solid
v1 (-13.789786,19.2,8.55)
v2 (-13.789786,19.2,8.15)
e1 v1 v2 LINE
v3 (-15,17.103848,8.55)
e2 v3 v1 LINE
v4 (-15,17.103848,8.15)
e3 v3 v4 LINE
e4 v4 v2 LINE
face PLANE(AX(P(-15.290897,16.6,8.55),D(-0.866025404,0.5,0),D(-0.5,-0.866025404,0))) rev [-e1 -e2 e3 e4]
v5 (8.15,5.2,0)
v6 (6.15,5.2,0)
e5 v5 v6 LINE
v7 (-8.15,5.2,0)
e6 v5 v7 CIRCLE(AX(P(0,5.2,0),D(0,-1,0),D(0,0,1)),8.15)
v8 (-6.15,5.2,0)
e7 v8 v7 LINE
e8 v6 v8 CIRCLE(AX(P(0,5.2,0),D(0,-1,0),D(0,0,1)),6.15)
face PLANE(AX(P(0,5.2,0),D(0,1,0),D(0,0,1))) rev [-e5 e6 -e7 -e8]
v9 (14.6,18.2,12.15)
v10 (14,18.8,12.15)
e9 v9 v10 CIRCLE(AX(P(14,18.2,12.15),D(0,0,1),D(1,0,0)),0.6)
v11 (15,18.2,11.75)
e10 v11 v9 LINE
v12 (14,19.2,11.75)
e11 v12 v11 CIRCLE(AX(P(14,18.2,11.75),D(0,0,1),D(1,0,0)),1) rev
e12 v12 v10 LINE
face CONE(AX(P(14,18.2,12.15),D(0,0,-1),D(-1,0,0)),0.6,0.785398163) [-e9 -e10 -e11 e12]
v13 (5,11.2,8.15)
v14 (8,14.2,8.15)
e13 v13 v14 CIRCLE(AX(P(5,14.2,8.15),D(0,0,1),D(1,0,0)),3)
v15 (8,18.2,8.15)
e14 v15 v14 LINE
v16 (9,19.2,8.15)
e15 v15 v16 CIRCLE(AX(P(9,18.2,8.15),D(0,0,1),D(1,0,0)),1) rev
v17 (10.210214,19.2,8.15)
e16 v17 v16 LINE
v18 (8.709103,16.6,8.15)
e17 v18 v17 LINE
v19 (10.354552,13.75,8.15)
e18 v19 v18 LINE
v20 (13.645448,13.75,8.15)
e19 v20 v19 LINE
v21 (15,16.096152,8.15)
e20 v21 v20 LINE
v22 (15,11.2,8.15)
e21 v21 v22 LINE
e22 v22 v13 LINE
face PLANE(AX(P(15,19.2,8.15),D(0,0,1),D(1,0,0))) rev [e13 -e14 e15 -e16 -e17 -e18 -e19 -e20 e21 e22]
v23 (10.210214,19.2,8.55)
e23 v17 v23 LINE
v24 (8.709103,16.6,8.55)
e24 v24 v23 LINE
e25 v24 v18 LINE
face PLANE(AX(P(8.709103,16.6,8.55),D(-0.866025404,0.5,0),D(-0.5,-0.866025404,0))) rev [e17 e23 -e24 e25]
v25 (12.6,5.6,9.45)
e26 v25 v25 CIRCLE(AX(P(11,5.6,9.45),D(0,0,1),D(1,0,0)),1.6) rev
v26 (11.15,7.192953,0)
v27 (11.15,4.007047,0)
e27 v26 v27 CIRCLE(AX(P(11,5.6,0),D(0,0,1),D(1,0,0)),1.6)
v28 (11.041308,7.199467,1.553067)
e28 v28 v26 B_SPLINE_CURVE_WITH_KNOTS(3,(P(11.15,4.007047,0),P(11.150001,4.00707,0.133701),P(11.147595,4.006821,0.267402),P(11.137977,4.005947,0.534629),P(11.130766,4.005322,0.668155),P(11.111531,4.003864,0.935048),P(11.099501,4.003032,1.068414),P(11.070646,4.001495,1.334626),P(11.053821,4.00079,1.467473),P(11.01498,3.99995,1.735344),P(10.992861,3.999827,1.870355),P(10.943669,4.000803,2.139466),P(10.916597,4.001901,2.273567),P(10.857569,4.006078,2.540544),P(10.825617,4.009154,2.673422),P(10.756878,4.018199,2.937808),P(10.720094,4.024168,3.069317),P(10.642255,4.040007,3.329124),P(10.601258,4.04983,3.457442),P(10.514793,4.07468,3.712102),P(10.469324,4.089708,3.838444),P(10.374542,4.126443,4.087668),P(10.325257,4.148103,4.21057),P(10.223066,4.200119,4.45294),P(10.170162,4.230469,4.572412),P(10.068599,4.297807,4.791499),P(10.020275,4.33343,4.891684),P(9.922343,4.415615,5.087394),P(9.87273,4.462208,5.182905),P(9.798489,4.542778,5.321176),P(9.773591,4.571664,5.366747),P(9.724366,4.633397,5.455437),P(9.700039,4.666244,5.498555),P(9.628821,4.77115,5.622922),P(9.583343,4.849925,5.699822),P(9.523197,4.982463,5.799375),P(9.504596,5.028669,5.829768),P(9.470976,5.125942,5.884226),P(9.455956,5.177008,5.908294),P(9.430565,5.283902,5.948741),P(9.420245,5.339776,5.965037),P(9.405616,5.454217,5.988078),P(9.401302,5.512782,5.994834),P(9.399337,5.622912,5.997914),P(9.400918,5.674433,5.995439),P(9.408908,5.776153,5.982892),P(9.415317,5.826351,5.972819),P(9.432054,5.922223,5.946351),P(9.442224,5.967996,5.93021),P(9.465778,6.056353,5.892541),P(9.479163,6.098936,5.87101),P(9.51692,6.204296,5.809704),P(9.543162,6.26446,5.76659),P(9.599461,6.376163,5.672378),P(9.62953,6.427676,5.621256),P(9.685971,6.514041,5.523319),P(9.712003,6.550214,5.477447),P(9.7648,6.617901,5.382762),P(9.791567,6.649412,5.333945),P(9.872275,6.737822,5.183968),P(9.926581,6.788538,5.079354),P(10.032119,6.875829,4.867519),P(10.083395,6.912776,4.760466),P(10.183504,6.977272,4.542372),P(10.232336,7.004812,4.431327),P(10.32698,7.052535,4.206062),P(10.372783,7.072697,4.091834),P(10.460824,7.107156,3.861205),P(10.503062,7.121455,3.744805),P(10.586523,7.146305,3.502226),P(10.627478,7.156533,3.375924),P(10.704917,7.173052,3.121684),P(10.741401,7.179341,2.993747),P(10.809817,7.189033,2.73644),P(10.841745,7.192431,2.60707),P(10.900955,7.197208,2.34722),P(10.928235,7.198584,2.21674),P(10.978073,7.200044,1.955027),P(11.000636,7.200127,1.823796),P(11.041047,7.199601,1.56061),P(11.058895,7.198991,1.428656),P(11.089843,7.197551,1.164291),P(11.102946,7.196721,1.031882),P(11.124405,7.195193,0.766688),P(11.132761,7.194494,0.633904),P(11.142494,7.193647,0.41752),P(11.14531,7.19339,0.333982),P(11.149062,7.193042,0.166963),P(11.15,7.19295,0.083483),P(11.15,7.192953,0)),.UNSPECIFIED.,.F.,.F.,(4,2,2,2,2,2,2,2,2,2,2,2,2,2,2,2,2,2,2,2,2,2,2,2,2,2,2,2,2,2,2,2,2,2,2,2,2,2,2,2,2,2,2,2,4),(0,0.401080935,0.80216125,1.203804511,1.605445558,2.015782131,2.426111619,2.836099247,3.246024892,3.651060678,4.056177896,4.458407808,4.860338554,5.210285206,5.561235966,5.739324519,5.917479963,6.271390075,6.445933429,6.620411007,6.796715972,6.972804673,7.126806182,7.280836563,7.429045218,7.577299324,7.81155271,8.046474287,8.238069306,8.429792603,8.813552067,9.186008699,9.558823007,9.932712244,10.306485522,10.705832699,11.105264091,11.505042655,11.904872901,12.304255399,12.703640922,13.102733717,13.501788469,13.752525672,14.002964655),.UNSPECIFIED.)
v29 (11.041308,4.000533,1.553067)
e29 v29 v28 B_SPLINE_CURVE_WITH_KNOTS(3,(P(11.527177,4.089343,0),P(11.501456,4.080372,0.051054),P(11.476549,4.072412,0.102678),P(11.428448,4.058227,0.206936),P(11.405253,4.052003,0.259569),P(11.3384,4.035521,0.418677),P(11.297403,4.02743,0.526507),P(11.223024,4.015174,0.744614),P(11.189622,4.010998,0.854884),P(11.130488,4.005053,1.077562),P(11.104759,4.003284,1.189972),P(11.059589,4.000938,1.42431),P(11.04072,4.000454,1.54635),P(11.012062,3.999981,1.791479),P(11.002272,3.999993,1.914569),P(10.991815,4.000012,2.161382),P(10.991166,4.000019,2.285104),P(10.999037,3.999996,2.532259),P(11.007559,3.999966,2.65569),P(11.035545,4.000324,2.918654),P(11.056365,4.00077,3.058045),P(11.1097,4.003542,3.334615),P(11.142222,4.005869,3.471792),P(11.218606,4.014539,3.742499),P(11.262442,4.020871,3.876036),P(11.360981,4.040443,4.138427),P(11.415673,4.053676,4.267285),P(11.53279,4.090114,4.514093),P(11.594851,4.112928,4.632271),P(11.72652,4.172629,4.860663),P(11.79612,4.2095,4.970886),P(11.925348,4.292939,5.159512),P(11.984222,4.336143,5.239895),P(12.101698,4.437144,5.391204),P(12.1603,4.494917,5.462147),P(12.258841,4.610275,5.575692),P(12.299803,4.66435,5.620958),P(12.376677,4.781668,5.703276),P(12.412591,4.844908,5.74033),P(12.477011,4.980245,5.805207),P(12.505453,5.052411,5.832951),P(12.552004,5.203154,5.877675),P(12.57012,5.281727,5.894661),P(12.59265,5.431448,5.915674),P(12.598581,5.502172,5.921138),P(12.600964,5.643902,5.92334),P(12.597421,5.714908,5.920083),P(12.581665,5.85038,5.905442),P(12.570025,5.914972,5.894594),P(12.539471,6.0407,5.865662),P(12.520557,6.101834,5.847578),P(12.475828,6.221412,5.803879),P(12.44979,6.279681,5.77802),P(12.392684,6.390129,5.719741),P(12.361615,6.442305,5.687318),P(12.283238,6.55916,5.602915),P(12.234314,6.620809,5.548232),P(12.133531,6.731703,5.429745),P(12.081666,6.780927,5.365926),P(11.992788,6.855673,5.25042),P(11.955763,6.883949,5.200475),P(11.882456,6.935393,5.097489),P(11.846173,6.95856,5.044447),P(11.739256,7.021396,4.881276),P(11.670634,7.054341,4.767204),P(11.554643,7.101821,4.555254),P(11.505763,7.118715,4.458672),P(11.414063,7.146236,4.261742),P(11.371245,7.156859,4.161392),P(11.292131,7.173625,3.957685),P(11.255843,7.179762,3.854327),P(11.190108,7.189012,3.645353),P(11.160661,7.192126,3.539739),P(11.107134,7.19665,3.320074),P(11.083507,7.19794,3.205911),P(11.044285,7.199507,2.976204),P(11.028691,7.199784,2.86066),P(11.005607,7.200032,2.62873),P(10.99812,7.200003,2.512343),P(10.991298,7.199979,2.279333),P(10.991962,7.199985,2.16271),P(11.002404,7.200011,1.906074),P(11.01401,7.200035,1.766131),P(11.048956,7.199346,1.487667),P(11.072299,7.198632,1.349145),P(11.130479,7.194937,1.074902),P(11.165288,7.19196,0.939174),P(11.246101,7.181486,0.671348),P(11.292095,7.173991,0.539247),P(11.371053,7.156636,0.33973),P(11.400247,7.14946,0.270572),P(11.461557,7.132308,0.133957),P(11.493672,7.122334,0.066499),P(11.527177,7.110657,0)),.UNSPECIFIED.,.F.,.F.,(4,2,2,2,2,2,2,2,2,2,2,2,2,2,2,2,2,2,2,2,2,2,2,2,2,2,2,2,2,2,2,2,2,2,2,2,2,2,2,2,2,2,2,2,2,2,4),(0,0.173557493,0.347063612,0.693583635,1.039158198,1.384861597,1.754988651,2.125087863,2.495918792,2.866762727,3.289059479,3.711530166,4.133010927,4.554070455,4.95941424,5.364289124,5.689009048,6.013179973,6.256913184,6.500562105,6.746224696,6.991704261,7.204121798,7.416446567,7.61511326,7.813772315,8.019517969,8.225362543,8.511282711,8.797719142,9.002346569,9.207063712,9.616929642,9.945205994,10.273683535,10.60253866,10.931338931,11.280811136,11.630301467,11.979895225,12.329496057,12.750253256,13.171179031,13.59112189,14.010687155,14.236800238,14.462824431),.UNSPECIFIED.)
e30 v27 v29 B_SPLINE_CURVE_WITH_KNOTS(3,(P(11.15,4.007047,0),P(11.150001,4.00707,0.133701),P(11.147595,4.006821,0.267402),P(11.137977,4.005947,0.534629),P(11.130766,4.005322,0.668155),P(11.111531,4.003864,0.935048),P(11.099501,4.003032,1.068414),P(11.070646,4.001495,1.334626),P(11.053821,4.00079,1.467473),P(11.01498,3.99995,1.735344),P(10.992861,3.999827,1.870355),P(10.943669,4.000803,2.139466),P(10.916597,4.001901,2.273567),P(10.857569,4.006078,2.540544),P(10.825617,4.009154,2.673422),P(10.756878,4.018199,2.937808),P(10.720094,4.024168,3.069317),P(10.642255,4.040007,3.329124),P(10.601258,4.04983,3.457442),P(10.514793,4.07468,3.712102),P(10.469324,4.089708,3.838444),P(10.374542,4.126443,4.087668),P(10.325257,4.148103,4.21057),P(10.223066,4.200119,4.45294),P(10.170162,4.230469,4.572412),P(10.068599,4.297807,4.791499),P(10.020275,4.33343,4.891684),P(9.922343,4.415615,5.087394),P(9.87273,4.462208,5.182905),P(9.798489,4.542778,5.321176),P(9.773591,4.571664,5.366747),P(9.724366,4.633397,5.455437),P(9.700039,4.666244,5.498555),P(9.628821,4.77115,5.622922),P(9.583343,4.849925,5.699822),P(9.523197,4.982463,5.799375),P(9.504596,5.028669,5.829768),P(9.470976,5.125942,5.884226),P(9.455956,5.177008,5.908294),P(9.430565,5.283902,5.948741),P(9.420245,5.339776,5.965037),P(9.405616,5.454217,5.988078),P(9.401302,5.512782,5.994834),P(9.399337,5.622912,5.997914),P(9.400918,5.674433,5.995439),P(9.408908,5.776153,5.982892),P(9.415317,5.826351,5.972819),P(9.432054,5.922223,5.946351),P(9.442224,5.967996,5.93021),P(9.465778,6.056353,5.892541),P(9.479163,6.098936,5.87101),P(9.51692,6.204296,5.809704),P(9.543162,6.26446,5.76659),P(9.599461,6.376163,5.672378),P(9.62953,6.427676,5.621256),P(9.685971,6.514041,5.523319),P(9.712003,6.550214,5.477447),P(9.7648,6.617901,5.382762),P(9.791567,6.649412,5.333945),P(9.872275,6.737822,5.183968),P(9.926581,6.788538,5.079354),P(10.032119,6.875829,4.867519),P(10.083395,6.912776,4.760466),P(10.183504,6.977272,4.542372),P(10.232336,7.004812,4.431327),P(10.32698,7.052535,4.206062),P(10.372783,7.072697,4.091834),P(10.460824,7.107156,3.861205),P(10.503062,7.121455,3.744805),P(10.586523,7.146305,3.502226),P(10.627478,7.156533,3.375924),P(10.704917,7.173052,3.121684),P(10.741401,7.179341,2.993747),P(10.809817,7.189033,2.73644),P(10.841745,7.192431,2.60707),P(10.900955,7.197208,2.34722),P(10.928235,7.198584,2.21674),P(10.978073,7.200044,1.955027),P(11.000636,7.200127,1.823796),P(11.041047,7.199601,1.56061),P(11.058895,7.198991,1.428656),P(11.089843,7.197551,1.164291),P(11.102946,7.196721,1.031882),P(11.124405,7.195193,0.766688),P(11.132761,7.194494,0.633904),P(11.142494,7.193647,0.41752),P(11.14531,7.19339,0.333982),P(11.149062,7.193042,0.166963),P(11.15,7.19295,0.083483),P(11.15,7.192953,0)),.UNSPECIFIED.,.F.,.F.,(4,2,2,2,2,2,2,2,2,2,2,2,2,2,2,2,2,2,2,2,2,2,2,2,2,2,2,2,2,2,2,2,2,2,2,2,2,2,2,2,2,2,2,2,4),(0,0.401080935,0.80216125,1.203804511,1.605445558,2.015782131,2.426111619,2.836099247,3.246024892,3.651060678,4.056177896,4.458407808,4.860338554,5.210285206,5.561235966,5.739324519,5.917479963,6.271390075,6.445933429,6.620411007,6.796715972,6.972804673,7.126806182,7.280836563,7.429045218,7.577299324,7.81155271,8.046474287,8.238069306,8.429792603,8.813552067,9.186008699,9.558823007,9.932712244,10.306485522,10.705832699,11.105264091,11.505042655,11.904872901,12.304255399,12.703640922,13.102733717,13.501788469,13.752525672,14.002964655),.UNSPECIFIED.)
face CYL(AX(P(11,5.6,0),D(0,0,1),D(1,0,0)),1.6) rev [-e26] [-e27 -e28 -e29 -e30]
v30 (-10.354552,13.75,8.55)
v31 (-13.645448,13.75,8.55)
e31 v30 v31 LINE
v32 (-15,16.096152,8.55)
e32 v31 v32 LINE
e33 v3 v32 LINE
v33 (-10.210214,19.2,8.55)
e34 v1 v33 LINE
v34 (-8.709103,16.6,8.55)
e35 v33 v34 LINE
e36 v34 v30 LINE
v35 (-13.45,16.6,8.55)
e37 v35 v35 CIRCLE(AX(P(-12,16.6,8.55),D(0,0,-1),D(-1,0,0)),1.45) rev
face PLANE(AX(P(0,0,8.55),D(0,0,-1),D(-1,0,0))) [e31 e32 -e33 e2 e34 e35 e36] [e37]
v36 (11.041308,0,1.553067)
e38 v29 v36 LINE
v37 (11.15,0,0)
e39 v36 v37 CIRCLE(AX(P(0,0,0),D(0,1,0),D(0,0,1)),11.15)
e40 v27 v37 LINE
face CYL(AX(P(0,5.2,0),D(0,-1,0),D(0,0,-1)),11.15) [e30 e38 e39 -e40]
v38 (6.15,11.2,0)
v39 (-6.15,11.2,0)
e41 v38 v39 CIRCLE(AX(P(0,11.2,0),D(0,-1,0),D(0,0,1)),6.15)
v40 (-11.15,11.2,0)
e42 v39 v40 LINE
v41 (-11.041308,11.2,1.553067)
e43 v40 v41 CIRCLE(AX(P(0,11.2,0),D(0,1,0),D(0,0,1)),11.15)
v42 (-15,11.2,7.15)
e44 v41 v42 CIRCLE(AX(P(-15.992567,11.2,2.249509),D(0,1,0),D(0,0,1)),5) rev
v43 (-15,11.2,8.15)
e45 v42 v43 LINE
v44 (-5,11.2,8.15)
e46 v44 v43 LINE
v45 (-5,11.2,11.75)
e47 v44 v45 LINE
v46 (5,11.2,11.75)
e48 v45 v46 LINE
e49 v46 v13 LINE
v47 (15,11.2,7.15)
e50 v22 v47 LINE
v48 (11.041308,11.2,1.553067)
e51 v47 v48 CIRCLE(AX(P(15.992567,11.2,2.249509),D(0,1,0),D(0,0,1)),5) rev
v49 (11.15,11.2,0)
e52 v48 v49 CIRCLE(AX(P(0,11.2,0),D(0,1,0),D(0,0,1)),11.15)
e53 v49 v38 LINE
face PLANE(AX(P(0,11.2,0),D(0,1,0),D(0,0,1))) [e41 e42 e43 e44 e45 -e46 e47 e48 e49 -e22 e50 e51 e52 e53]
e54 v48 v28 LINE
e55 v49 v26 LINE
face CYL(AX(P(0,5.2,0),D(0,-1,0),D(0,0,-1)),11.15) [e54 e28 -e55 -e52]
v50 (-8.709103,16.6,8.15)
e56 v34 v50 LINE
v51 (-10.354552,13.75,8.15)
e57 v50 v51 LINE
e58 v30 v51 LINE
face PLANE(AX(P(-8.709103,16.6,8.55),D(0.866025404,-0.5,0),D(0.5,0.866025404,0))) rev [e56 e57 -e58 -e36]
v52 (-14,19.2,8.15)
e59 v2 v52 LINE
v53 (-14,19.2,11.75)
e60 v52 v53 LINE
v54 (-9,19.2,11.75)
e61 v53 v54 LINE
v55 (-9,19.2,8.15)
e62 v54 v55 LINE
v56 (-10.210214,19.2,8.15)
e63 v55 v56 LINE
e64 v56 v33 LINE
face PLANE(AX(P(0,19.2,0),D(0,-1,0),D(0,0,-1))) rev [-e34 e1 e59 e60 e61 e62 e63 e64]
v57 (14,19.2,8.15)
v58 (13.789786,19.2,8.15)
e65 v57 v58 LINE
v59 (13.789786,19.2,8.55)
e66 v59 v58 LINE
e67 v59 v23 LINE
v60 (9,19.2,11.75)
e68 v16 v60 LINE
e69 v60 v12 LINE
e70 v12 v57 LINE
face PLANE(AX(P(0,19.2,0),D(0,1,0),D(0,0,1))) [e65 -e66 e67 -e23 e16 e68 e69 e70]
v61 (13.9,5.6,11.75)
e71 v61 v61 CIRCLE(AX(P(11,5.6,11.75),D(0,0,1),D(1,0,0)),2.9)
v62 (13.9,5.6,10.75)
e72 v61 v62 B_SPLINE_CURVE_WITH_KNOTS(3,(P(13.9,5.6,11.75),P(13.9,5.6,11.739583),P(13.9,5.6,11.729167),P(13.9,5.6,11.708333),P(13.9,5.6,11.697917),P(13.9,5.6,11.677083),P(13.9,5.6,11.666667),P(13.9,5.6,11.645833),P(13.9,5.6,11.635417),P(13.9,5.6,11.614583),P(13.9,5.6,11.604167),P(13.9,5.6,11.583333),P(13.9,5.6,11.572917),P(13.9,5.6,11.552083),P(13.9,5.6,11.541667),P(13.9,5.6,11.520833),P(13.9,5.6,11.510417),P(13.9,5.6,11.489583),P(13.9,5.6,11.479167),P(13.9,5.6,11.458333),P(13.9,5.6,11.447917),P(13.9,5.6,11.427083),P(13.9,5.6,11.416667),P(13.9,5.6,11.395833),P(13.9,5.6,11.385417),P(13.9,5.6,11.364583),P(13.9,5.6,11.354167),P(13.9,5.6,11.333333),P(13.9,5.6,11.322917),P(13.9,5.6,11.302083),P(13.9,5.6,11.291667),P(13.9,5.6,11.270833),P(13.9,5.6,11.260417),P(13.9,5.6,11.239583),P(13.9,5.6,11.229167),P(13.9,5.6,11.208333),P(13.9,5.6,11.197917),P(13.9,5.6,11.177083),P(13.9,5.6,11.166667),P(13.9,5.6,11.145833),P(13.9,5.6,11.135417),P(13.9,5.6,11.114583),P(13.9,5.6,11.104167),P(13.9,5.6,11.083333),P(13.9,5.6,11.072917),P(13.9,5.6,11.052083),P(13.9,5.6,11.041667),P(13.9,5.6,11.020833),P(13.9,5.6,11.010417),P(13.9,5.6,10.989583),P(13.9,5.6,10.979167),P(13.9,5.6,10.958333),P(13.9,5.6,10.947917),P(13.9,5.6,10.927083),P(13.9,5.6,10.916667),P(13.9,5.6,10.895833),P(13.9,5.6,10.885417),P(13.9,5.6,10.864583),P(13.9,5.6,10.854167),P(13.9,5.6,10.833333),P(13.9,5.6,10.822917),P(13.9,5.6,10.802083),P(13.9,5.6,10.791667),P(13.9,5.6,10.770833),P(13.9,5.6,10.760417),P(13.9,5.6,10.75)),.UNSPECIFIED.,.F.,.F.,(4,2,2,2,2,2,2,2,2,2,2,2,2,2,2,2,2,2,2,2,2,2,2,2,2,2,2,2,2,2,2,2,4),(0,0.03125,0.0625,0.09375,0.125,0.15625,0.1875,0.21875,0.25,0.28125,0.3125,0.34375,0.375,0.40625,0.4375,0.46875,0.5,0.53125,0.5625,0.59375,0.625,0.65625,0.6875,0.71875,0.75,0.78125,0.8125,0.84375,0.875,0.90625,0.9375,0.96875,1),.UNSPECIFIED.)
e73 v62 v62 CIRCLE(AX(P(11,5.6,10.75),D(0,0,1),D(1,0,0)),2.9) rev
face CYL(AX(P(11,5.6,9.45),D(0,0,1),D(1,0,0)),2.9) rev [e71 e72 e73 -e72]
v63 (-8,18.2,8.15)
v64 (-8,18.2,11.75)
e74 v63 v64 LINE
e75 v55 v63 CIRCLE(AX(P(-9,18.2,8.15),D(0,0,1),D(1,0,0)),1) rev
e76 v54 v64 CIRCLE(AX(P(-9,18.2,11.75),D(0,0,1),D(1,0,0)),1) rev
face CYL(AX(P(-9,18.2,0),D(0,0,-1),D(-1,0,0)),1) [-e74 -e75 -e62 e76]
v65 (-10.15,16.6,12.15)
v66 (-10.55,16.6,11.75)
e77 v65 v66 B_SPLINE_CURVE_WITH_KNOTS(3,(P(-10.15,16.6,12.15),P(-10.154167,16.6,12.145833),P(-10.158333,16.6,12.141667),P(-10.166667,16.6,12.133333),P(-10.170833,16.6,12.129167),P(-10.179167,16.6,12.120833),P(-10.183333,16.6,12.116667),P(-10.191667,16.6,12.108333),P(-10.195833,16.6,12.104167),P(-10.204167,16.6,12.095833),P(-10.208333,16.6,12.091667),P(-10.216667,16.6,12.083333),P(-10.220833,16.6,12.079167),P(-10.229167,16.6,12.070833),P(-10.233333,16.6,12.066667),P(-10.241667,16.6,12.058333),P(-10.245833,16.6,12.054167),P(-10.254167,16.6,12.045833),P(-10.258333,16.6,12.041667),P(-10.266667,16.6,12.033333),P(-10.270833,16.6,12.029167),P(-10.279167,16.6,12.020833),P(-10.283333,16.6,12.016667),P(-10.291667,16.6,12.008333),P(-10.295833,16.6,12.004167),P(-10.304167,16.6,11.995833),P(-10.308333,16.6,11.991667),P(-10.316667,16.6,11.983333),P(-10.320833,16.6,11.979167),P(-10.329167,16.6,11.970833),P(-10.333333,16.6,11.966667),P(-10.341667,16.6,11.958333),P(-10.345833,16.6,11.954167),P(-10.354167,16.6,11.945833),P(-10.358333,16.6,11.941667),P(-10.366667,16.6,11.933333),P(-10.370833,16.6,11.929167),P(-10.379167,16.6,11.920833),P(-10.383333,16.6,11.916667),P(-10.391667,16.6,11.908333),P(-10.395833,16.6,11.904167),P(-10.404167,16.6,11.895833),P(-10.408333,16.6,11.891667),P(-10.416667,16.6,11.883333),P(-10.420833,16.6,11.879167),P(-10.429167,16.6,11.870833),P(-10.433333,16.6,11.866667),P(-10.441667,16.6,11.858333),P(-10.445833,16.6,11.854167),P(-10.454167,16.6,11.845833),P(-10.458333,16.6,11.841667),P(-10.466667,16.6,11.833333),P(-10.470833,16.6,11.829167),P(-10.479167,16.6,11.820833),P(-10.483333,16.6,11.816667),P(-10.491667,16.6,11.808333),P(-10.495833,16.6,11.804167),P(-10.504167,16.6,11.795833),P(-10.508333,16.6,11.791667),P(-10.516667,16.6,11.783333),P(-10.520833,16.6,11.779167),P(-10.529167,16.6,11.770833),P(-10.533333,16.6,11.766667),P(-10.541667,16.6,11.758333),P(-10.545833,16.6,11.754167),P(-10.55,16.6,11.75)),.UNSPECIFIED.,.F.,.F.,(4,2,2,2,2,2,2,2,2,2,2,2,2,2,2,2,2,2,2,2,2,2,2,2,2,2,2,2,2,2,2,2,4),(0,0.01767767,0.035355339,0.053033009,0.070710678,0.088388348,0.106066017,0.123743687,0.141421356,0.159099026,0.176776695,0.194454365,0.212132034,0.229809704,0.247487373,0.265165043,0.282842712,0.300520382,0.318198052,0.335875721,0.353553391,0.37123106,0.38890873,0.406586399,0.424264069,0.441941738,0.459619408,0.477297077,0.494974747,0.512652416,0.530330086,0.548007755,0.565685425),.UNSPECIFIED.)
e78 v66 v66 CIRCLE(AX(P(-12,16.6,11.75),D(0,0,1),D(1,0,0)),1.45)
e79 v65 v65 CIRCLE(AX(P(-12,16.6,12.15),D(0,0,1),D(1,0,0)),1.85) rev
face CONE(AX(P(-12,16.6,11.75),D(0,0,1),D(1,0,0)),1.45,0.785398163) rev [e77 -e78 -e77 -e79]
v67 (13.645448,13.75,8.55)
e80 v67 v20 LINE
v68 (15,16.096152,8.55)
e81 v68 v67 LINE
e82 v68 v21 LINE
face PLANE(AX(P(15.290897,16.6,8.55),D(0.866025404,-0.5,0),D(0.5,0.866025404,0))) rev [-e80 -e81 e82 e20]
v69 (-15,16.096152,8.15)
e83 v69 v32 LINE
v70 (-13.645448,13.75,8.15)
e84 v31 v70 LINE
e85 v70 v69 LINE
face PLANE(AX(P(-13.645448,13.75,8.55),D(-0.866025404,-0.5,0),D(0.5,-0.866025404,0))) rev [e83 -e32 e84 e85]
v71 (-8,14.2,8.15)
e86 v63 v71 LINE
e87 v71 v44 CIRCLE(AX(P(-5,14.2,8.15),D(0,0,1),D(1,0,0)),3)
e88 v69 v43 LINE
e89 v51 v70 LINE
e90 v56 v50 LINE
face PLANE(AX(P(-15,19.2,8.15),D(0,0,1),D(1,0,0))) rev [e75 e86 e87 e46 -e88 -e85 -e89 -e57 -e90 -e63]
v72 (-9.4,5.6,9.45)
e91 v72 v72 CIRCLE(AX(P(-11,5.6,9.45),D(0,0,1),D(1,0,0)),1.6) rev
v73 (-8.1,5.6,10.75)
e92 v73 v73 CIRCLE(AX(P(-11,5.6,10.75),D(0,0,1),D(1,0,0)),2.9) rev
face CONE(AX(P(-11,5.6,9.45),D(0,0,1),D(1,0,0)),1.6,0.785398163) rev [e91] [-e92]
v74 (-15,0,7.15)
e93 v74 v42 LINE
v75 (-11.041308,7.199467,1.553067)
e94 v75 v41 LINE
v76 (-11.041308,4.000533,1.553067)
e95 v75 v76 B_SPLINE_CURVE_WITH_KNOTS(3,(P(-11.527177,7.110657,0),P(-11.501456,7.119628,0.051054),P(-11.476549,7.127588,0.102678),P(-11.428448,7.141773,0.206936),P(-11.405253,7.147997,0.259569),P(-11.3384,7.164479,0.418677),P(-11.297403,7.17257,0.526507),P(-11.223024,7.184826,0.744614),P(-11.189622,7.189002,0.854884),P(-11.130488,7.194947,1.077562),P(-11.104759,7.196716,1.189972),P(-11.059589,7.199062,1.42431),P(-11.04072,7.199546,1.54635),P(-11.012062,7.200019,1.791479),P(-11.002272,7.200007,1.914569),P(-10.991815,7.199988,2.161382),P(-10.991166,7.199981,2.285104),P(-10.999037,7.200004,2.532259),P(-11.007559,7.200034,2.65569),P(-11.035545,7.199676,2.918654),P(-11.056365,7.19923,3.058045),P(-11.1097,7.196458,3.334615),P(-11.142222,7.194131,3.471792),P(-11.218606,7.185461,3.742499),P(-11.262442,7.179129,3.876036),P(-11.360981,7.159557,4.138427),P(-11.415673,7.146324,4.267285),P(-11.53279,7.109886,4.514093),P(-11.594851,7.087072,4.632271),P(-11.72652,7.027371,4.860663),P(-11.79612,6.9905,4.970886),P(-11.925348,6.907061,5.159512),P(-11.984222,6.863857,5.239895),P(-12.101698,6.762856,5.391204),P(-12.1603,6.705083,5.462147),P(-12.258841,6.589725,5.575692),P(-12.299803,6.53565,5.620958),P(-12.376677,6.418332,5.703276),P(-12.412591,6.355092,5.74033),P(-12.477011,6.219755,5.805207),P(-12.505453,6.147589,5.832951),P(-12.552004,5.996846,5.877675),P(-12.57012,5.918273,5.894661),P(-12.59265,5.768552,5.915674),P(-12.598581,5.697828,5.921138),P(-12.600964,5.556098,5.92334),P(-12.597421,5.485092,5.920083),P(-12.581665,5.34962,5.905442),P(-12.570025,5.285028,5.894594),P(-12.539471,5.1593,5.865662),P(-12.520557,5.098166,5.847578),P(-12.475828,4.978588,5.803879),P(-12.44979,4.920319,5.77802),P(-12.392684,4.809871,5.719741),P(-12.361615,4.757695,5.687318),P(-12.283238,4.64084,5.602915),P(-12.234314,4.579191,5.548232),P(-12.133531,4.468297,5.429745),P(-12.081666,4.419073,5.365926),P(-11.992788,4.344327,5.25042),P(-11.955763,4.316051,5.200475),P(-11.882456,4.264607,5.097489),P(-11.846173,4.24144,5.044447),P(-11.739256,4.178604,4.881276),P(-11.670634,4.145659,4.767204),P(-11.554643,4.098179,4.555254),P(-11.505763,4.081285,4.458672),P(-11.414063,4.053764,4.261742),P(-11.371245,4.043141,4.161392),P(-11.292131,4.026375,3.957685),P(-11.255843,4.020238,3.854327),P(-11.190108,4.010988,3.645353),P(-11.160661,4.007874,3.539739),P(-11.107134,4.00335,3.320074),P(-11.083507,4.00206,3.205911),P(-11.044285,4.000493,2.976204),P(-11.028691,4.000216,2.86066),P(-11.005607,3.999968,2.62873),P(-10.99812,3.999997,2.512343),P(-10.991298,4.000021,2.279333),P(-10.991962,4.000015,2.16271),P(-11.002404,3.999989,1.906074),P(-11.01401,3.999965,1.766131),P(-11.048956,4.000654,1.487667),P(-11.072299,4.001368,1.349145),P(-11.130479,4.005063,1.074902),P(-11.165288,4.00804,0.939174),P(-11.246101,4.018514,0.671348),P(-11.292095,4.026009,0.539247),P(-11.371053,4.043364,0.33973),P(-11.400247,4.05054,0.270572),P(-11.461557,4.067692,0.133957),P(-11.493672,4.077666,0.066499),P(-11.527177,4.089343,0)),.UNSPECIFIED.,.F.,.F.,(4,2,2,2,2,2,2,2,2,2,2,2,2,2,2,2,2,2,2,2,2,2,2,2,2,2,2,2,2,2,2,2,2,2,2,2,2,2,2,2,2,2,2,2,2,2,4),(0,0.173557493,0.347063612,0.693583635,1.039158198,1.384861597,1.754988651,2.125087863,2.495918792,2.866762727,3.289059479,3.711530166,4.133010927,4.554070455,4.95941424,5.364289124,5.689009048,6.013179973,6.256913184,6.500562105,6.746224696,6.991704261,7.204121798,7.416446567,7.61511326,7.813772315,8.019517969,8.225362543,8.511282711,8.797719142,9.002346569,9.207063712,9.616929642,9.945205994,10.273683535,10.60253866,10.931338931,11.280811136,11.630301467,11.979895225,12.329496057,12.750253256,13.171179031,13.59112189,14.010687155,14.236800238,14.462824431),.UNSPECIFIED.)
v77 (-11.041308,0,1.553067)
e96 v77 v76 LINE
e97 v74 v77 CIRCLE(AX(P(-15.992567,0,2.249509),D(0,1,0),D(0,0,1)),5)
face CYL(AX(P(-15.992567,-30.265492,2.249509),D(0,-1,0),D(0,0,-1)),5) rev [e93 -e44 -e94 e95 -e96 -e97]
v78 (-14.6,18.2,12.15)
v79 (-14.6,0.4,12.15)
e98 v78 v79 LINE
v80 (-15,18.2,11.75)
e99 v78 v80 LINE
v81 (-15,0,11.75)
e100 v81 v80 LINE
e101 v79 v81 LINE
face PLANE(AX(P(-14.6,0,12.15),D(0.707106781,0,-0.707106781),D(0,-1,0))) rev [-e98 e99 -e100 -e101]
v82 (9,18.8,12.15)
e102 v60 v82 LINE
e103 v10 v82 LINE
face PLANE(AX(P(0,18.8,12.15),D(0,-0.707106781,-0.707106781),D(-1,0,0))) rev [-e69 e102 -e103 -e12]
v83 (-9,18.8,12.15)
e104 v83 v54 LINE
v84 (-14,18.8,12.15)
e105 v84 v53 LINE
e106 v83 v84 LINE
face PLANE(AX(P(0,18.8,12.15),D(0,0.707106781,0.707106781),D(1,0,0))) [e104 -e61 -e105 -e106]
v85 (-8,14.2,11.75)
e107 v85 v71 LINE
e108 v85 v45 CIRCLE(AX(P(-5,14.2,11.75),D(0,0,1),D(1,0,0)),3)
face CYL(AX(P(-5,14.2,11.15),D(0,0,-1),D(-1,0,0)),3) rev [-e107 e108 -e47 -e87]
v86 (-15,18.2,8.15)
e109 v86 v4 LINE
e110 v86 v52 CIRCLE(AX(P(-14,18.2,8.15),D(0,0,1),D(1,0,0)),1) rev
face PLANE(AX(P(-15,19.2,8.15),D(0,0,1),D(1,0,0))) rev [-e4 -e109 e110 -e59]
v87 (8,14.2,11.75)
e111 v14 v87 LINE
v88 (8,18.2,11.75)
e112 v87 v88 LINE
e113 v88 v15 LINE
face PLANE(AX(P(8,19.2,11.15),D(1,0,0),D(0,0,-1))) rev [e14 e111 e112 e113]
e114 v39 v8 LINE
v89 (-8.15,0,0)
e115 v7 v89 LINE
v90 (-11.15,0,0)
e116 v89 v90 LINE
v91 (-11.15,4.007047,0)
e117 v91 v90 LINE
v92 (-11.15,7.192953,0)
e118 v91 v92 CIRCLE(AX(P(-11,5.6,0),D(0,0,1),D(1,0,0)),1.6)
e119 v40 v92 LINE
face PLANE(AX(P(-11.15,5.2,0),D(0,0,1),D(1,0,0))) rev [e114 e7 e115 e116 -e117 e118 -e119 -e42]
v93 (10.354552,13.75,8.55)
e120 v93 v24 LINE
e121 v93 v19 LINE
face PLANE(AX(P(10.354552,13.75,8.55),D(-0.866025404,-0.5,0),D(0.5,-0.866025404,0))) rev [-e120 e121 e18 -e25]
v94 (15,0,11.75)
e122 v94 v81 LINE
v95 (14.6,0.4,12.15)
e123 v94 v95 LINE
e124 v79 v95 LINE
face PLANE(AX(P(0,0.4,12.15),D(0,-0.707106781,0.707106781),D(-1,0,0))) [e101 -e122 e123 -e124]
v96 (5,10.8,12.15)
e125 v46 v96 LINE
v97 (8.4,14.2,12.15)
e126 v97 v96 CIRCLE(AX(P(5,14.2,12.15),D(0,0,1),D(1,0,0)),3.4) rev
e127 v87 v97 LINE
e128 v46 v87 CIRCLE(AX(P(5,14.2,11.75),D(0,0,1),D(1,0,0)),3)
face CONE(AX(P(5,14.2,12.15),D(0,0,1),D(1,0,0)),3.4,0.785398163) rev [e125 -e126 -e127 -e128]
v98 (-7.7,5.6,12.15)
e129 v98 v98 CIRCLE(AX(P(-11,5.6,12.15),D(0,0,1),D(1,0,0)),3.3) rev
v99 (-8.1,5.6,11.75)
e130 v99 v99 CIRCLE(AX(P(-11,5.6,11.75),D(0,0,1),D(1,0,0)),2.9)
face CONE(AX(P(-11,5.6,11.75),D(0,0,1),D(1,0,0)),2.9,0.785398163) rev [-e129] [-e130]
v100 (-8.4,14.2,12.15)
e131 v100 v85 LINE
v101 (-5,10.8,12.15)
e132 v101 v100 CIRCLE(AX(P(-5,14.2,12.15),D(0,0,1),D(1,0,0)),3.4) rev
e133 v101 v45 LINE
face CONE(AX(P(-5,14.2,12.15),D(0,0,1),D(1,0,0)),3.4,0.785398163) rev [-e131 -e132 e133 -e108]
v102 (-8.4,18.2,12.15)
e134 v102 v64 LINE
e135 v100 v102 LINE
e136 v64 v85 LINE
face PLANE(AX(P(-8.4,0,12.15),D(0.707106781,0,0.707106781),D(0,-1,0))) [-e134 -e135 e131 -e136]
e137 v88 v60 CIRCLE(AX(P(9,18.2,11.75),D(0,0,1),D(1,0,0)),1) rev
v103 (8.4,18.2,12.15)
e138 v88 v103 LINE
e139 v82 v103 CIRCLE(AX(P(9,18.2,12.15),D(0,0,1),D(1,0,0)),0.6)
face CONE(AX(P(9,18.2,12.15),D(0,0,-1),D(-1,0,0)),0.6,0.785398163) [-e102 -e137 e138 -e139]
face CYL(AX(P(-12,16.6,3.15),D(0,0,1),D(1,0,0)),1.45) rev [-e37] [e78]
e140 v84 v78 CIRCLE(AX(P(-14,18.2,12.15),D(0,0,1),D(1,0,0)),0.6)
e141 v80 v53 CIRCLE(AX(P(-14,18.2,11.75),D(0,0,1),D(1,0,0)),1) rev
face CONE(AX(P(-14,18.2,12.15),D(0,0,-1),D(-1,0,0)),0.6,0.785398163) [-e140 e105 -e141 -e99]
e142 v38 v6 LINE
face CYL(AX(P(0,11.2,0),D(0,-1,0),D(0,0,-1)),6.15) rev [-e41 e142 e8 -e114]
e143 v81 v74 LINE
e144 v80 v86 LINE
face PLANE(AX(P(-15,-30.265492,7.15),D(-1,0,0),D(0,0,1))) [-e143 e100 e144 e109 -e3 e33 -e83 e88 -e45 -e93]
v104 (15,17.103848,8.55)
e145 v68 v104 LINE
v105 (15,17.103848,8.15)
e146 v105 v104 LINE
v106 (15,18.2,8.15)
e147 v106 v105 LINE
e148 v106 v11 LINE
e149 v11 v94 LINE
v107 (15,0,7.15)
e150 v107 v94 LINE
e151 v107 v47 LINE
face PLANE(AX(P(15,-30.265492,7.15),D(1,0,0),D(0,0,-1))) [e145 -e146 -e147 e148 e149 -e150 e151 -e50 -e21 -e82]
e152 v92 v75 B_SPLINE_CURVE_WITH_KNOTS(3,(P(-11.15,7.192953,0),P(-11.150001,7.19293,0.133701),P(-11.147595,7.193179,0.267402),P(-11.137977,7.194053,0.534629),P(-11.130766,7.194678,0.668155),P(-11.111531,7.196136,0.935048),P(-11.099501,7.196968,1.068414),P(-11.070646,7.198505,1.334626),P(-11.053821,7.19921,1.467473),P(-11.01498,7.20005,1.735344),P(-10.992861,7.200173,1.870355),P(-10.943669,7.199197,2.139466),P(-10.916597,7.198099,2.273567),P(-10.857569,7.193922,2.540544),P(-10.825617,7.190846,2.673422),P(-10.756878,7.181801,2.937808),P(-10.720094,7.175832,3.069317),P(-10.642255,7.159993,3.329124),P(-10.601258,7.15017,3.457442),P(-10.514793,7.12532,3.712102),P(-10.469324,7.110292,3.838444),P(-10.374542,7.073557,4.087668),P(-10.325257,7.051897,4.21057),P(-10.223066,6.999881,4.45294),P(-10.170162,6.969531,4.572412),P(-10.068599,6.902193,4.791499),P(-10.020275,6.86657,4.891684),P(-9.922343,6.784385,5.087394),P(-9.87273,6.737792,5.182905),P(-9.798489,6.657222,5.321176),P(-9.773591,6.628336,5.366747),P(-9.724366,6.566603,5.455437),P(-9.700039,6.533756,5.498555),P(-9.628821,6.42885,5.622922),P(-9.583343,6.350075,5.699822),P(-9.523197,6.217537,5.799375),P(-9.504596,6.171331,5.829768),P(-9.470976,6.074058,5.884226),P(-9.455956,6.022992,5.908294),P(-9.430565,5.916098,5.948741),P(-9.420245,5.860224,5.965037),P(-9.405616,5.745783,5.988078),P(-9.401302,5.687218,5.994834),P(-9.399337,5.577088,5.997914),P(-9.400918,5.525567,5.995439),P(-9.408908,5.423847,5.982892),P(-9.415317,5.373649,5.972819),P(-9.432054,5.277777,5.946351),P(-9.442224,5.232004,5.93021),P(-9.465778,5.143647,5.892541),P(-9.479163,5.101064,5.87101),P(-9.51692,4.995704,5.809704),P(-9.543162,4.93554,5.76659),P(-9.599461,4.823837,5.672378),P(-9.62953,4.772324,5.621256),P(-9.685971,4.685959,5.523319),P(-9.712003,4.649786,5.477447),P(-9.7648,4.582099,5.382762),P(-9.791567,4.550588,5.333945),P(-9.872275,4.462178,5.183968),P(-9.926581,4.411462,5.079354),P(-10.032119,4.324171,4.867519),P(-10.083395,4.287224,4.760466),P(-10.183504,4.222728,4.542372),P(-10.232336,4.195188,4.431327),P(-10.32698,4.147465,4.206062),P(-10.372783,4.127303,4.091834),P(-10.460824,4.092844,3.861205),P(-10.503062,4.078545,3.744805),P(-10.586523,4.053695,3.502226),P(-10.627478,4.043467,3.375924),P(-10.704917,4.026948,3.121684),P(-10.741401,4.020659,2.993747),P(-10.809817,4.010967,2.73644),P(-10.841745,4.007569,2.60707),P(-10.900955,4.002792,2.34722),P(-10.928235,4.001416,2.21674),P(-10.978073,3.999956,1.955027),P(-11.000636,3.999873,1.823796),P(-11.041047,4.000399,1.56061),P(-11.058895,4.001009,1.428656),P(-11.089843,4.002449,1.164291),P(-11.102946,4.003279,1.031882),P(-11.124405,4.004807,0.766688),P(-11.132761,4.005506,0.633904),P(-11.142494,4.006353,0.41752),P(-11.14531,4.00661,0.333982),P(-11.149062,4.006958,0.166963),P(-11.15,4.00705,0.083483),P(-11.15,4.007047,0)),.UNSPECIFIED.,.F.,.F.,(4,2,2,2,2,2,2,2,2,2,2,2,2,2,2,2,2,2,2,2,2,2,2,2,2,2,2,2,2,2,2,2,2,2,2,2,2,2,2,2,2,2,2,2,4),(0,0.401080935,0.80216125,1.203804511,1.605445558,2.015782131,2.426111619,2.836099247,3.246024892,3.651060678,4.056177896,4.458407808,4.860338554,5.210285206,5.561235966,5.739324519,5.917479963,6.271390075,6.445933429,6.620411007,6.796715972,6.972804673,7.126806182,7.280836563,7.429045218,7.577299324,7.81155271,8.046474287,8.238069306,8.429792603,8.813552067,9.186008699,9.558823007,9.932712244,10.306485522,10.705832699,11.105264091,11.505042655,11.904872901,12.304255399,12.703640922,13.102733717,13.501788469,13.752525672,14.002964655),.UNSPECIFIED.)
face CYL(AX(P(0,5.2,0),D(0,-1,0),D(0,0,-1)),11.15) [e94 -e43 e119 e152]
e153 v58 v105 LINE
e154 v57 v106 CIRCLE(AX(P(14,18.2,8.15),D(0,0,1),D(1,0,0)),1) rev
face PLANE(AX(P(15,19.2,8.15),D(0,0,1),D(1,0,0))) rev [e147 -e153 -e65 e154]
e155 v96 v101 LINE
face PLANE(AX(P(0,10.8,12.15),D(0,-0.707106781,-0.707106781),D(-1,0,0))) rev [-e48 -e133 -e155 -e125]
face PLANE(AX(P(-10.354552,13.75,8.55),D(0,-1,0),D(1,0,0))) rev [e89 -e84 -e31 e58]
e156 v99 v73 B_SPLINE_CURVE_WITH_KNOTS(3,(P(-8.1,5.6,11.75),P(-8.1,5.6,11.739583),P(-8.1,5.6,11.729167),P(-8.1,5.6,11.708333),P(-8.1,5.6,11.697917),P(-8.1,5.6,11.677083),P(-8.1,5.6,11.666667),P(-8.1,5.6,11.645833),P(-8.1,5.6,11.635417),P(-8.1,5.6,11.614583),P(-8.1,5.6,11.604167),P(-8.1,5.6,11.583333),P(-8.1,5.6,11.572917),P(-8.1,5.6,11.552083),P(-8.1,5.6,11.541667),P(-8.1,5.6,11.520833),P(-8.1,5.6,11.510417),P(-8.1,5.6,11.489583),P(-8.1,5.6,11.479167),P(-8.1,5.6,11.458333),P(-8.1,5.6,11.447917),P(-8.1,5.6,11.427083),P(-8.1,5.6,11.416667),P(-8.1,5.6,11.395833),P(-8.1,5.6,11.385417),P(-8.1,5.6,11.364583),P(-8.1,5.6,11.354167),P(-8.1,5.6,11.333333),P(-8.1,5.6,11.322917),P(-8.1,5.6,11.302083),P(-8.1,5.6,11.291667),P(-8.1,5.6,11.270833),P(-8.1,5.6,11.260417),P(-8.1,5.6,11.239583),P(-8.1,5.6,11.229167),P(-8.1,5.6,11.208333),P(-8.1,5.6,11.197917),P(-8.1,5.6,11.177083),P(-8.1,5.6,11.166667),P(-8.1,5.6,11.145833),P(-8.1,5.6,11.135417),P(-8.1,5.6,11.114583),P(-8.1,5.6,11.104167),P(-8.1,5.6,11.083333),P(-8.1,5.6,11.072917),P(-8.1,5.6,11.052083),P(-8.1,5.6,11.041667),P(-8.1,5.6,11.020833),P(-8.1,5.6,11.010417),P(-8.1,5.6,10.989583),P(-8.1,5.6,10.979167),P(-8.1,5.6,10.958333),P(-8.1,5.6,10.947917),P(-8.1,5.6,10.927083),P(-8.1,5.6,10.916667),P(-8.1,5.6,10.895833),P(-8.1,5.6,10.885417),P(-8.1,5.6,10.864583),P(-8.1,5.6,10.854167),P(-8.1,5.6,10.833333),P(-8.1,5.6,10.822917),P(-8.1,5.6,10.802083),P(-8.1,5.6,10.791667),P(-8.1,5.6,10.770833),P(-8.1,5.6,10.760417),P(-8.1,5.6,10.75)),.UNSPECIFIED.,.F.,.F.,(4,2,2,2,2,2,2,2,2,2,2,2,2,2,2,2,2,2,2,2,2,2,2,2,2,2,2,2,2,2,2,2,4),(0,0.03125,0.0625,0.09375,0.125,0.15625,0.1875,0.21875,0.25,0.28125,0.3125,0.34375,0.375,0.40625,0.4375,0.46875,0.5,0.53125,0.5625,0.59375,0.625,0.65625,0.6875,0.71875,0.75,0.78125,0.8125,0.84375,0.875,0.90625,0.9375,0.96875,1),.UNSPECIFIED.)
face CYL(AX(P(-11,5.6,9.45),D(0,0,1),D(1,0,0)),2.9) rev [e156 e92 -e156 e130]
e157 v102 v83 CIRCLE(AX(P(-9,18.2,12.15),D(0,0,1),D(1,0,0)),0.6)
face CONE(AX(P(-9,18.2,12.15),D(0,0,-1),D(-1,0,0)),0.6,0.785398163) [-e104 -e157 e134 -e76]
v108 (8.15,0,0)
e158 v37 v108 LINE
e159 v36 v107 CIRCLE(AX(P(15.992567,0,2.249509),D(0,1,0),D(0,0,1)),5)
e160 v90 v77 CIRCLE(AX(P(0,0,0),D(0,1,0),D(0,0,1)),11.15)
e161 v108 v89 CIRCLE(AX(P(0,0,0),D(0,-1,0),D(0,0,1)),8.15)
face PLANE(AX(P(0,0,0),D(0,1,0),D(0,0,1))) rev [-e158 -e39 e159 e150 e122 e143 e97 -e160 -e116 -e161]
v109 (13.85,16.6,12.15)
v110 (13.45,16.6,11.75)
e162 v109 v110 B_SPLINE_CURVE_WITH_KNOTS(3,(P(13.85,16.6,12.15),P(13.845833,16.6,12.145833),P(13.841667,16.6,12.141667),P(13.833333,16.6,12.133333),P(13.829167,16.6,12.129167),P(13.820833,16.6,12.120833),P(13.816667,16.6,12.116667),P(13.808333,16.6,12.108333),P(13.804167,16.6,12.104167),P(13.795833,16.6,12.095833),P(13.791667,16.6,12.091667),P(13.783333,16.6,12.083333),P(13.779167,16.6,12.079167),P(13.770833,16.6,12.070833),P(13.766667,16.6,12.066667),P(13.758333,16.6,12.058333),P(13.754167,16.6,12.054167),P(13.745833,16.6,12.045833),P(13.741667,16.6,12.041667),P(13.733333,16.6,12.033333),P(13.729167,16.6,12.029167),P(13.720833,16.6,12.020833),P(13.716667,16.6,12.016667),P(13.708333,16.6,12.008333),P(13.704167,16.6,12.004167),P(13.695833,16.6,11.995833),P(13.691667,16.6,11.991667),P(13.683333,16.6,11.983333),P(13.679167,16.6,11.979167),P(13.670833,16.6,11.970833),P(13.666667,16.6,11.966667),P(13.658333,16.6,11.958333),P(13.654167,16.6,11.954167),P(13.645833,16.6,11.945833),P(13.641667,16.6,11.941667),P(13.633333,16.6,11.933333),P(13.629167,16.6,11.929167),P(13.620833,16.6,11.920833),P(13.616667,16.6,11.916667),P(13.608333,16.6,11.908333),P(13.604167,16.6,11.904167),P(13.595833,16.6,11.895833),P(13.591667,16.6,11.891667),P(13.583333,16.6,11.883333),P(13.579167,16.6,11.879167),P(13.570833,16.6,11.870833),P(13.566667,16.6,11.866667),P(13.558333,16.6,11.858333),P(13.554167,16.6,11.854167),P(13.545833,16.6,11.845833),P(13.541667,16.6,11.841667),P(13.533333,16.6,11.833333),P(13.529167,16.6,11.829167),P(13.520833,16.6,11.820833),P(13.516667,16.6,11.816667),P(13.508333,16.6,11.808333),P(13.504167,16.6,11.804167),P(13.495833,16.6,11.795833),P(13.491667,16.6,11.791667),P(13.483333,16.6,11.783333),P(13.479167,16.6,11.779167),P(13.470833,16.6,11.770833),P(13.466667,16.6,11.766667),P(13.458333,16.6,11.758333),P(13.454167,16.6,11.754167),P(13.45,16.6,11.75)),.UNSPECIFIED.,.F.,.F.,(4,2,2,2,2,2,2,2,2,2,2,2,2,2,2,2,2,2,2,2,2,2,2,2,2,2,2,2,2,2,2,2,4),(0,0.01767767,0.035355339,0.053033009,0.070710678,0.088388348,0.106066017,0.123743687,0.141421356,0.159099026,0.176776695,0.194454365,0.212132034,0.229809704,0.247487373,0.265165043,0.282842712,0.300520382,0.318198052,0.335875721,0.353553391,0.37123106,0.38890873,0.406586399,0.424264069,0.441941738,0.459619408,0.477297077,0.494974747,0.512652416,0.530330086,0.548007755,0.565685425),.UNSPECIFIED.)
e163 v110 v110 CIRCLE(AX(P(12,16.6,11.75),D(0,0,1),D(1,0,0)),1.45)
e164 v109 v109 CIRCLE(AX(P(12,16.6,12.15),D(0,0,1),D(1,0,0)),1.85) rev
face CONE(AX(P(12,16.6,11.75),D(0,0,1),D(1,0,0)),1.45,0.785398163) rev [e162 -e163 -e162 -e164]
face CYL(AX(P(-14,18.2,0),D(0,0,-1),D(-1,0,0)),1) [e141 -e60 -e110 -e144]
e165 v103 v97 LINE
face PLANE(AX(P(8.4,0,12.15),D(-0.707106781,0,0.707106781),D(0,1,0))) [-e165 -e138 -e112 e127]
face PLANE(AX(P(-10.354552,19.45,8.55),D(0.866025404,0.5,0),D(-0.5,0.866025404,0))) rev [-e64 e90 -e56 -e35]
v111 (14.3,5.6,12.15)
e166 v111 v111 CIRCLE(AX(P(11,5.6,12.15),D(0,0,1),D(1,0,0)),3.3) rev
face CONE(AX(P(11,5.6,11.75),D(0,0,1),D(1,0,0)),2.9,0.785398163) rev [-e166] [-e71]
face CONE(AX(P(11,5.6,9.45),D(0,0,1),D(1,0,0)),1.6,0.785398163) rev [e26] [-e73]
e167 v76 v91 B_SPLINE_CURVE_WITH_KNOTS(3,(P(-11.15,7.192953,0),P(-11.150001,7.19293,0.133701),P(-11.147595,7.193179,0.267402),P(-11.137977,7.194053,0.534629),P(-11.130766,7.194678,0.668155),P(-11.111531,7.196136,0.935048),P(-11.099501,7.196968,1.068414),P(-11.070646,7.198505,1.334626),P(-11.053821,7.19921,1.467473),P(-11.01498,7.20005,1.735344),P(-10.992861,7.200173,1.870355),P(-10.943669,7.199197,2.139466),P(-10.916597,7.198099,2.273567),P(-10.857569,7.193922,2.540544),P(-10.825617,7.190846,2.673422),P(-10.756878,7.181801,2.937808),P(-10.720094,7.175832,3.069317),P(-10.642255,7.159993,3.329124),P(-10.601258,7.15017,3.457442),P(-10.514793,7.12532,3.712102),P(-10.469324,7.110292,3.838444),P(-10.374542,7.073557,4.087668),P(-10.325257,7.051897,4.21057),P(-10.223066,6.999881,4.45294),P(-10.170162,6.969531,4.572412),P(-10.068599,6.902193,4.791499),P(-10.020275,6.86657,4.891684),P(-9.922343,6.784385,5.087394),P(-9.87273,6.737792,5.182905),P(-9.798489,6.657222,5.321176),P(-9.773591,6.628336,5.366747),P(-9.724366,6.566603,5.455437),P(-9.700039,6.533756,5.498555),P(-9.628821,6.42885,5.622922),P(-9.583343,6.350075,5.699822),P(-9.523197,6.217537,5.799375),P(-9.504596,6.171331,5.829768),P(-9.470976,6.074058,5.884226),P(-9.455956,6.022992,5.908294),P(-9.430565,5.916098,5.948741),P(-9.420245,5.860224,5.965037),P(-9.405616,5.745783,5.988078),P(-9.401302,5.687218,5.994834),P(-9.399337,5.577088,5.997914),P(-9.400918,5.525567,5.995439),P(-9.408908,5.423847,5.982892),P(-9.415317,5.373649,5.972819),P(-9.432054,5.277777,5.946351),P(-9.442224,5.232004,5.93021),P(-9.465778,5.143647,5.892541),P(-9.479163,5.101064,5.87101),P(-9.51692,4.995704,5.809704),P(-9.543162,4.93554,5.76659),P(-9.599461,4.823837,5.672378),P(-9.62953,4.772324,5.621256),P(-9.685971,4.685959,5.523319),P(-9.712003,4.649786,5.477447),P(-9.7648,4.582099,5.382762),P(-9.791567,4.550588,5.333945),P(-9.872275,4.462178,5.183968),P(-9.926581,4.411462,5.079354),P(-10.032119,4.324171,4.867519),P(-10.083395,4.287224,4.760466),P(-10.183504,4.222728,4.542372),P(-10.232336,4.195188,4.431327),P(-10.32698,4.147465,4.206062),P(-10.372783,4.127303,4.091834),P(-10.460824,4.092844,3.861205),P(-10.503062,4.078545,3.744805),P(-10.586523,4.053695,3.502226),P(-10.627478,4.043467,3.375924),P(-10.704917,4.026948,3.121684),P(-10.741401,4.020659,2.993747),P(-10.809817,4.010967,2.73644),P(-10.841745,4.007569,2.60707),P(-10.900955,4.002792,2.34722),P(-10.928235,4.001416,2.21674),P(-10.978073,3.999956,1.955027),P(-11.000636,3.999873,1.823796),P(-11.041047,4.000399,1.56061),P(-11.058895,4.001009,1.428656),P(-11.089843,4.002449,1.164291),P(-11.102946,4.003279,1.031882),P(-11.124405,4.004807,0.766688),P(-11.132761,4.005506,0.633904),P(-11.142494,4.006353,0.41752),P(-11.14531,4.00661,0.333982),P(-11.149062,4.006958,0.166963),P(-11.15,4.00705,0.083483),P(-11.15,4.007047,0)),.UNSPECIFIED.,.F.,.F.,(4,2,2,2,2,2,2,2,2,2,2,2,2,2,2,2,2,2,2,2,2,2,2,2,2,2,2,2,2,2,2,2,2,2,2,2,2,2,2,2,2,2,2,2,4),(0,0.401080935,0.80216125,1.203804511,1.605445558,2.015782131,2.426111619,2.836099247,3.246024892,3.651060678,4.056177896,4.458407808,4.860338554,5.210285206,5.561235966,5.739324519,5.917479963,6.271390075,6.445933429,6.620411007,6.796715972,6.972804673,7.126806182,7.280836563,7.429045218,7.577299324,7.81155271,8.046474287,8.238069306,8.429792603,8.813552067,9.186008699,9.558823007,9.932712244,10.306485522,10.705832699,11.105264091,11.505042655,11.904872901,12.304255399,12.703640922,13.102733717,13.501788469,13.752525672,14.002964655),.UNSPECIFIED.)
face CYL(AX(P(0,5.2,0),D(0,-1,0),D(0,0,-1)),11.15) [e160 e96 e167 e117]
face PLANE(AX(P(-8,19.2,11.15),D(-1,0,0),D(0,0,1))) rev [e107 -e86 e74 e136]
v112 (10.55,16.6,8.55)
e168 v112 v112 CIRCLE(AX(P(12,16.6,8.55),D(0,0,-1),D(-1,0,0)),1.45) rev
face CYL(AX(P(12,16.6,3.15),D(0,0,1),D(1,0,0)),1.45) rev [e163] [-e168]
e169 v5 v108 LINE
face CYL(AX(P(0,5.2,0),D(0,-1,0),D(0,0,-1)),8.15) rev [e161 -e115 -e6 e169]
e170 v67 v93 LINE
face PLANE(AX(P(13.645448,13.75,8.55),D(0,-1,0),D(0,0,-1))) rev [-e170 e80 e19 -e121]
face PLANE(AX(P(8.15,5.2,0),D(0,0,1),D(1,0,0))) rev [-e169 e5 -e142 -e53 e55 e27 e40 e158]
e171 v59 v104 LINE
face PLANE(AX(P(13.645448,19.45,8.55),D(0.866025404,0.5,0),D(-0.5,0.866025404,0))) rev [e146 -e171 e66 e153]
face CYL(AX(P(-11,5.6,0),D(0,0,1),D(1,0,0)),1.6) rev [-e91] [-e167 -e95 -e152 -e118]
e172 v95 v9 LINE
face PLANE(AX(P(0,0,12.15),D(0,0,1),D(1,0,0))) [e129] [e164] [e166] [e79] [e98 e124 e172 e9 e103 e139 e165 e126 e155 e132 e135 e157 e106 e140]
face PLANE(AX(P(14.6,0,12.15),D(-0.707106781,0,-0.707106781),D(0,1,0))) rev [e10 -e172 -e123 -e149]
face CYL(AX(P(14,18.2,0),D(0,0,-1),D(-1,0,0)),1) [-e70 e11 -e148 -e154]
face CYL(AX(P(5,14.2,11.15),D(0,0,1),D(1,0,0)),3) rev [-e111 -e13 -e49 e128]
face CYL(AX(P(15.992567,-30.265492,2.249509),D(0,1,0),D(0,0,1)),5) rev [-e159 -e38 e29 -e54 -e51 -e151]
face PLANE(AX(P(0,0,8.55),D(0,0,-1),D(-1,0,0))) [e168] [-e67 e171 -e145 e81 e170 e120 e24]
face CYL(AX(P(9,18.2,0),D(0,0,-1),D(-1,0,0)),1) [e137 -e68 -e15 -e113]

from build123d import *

# Parameters (mm, degrees)
EXTRUDE_1_DEPTH     = 5.2
EXTRUDE_2_DEPTH     = 6
EXTRUDE_START       = -11.2
EXTRUDE_3_DEPTH     = 11.2
FILLET_1_R          = 5
SKETCH_4_R          = 1.6
CUT_EXTRUDE_1_DEPTH = 22.789045413
SKETCH_7_W          = 7
SKETCH_7_H          = 3
EXTRUDE_5_DEPTH     = 8
SKETCH_8_R          = 1.45
CUT_EXTRUDE_3_DEPTH = 8
EXTRUDE_START_2     = 1
SKETCH_9_R          = 1.45
SKETCH_9_R_2        = 1.6
EXTRUDE_6_DEPTH     = 1
FILLET_2_R          = 3
FILLET_3_R          = 1
SKETCH_10_R         = 2.9
CUT_EXTRUDE_4_DEPTH = 2.7
CHAMFER_2_SIZE      = 1.3
CHAMFER_1_SIZE      = 0.4
CUT_EXTRUDE_5_DEPTH = 0.4


# Some blends are built 0.0001 mm under size
with BuildPart() as part:
    # 草图1 → 凸台-拉伸1 (new body)
    with BuildSketch(Plane(origin=(0, 0, 0), x_dir=(1, 0, 0), z_dir=(0, 1, 0))):
        with BuildLine():
            Line((-11.15, 0), (-8.15, 0))
            ThreePointArc((-8.15, 0), (0, -8.15), (8.15, 0))
            Line((8.15, 0), (11.15, 0))
            ThreePointArc((11.15, 0), (0, -11.15), (-11.15, 0))
        make_face()
    extrude(amount=EXTRUDE_1_DEPTH)

    # 草图2 → 凸台-拉伸2 (add)
    with BuildSketch(Plane(origin=(0, 5.2, 0), x_dir=(1, 0, 0), z_dir=(0, 1, 0))):
        with BuildLine():
            Line((-11.15, 0), (-6.15, 0))
            ThreePointArc((-6.15, 0), (0, -6.15), (6.15, 0))
            Line((6.15, 0), (11.15, 0))
            ThreePointArc((11.15, 0), (0, -11.15), (-11.15, 0))
        make_face()
    extrude(amount=EXTRUDE_2_DEPTH)

    # 草图3 → 凸台-拉伸3 (add)
    with BuildSketch(Plane(origin=(0, 11.2, 0), x_dir=(1, 0, 0), z_dir=(0, 1, 0)).offset(EXTRUDE_START)):
        with BuildLine():
            Line((3.911521443, -7.15), (15, -7.15))
            Line((15, -7.15), (15, -11.15))
            Line((15, -11.15), (-15, -11.15))
            Line((-15, -11.15), (-15, -7.15))
            Line((-15, -7.15), (-3.911521443, -7.15))
            ThreePointArc((-3.911521443, -7.15), (0, -8.15), (3.911521443, -7.15))
        make_face()
    extrude(amount=EXTRUDE_3_DEPTH)

    # 圆角1
    # the kernel refuses this fillet: 5 mm, written as the material it adds along each edge
    with BuildSketch(Plane(origin=(-8.555699854, 11.2, 7.15), x_dir=(-0.4058769598957605, 0, -0.9139277287760642), z_dir=(0, -1, 0))) as fillet_1_piece_1:
        with BuildLine():
            CenterArc((7.497147581, -4.807763049), FILLET_1_R, 105.939417034, 86.556633096)
            Line((2.615592952, -5.889624596), (2.517961859, -5.911261826))
            ThreePointArc((2.517961859, -5.911261826), (1.216403703, -2.985399994), (-0.091392773, -0.040587696))
            Line((-0.091392773, -0.040587696), (0.027462079, 0.096155261))
            ThreePointArc((0.027462079, 0.096155261), (3.062021814, -0.328688401), (6.096581549, 0.096155261))
            Line((6.096581549, 0.096155261), (6.124043628, 0))
        make_face()
    extrude(amount=11.2)
    with BuildSketch(Plane(origin=(8.555699854, 11.2, 7.15), x_dir=(1, 0, 0), z_dir=(0, -1, 0))) as fillet_1_piece_2:
        with BuildLine():
            CenterArc((7.436867432, -4.90049081), FILLET_1_R, 101.450043509, 86.556633096)
            Line((2.48560821, -5.596933284), (2.386583026, -5.610862133))
            ThreePointArc((2.386583026, -5.610862133), (1.543201548, -2.665059593), (-0.076732734, -0.064125561))
            Line((-0.076732734, -0.064125561), (0, 0.1))
            ThreePointArc((0, 0.1), (3.222150073, 0.1), (6.4244488, 0.098009816))
            Line((6.4244488, 0.098009816), (6.444300146, 0))
        make_face()
    extrude(amount=11.2)

    # 草图4 → 切除-拉伸1 (cut, through all)
    with BuildSketch(Plane.XY.offset(11.15)):
        with Locations((-11, 5.6)):
            Circle(SKETCH_4_R)
        with Locations((11, 5.6)):
            Circle(SKETCH_4_R)
    extrude(amount=-CUT_EXTRUDE_1_DEPTH, mode=Mode.SUBTRACT)

    # 草图7 → 凸台-拉伸5 (add)
    with BuildSketch(Plane(origin=(0, 11.2, 0), x_dir=(1, 0, 0), z_dir=(0, 1, 0))):
        with Locations((-11.5, -9.65)):
            Rectangle(SKETCH_7_W, SKETCH_7_H)
        with Locations((11.5, -9.65)):
            Rectangle(SKETCH_7_W, SKETCH_7_H)
    extrude(amount=EXTRUDE_5_DEPTH)

    # 草图8 → 切除-拉伸3 (cut)
    with BuildSketch(Plane.XY.offset(11.15)):
        with Locations((-12, 16.6)):
            Circle(SKETCH_8_R)
        with Locations((12, 16.6)):
            Circle(SKETCH_8_R)
    extrude(amount=-CUT_EXTRUDE_3_DEPTH, mode=Mode.SUBTRACT)

    # 草图9 → 凸台-拉伸6 (add)
    with BuildSketch(Plane.XY.offset(11.15).offset(EXTRUDE_START_2)):
        Polygon((-15, 19.2), (-15, 0), (15, 0), (15, 19.2), (8, 19.2), (8, 11.2), (-8, 11.2), (-8, 19.2), align=None)
        with Locations((-12, 16.6)):
            Circle(SKETCH_9_R, mode=Mode.SUBTRACT)
        with Locations((-11, 5.6)):
            Circle(SKETCH_9_R_2, mode=Mode.SUBTRACT)
        with Locations((11, 5.6)):
            Circle(SKETCH_9_R_2, mode=Mode.SUBTRACT)
        with Locations((12, 16.6)):
            Circle(SKETCH_9_R, mode=Mode.SUBTRACT)
    extrude(amount=-EXTRUDE_6_DEPTH)

    # 圆角2
    fillet_2_edges = [part.edges().sort_by_distance(p)[0] for p in [
        (8, 11.2, 10.15),
        (-8, 11.2, 10.15),
    ]]
    fillet(fillet_2_edges, radius=FILLET_2_R)

    # 圆角3
    fillet_3_edges = [part.edges().sort_by_distance(p)[0] for p in [
        (15, 19.2, 10.15),
        (8, 19.2, 10.15),
        (-15, 19.2, 10.15),
        (-8, 19.2, 10.15),
    ]]
    fillet(fillet_3_edges, radius=FILLET_3_R)

    # 草图10 → 切除-拉伸4 (cut)
    with BuildSketch(Plane.XY.offset(12.15)):
        with Locations((-11, 5.6)):
            Circle(SKETCH_10_R)
        with Locations((11, 5.6)):
            Circle(SKETCH_10_R)
    extrude(amount=-CUT_EXTRUDE_4_DEPTH, mode=Mode.SUBTRACT)

    # 倒角2
    chamfer_2_edges = [part.edges().sort_by_distance(p)[0] for p in [
        (-13.9, 5.6, 9.45),
        (8.1, 5.6, 9.45),
    ]]
    chamfer(chamfer_2_edges, length=CHAMFER_2_SIZE - 0.0001)  # a hair under: the kernel refuses the full size

    # 倒角1
    chamfer_1_edges = [part.edges().sort_by_distance(p)[0] for p in [
        (0, 0, 12.15),
        (15, 9.1, 12.15),
        (-13.45, 16.6, 12.15),
        (10.55, 16.6, 12.15),
        (0, 11.2, 12.15),
        (-8, 16.2, 12.15),
        (7.121320344, 12.078679656, 12.15),
        (-7.121320344, 12.078679656, 12.15),
        (11.5, 19.2, 12.15),
        (-11.5, 19.2, 12.15),
        (-15, 9.1, 12.15),
        (8, 16.2, 12.15),
        (-14.707106781, 18.907106781, 12.15),
        (-8.292893219, 18.907106781, 12.15),
        (8.292893219, 18.907106781, 12.15),
        (14.707106781, 18.907106781, 12.15),
        (-13.9, 5.6, 12.15),
        (8.1, 5.6, 12.15),
    ]]
    chamfer(chamfer_1_edges, length=CHAMFER_1_SIZE)

    # 草图11 → 切除-拉伸5 (cut)
    with BuildSketch(Plane(origin=(0, 0, 8.15), x_dir=(-1, 0, 0), z_dir=(0, 0, -1))):
        Polygon((-8.709103466, 16.6), (-10.354551733, 19.45), (-13.645448267, 19.45), (-15.290896534, 16.6), (-13.645448267, 13.75), (-10.354551733, 13.75), align=None)
        Polygon((15.290896534, 16.6), (13.645448267, 19.45), (10.354551733, 19.45), (8.709103466, 16.6), (10.354551733, 13.75), (13.645448267, 13.75), align=None)
    extrude(amount=-CUT_EXTRUDE_5_DEPTH, mode=Mode.SUBTRACT)


solid = part.part
